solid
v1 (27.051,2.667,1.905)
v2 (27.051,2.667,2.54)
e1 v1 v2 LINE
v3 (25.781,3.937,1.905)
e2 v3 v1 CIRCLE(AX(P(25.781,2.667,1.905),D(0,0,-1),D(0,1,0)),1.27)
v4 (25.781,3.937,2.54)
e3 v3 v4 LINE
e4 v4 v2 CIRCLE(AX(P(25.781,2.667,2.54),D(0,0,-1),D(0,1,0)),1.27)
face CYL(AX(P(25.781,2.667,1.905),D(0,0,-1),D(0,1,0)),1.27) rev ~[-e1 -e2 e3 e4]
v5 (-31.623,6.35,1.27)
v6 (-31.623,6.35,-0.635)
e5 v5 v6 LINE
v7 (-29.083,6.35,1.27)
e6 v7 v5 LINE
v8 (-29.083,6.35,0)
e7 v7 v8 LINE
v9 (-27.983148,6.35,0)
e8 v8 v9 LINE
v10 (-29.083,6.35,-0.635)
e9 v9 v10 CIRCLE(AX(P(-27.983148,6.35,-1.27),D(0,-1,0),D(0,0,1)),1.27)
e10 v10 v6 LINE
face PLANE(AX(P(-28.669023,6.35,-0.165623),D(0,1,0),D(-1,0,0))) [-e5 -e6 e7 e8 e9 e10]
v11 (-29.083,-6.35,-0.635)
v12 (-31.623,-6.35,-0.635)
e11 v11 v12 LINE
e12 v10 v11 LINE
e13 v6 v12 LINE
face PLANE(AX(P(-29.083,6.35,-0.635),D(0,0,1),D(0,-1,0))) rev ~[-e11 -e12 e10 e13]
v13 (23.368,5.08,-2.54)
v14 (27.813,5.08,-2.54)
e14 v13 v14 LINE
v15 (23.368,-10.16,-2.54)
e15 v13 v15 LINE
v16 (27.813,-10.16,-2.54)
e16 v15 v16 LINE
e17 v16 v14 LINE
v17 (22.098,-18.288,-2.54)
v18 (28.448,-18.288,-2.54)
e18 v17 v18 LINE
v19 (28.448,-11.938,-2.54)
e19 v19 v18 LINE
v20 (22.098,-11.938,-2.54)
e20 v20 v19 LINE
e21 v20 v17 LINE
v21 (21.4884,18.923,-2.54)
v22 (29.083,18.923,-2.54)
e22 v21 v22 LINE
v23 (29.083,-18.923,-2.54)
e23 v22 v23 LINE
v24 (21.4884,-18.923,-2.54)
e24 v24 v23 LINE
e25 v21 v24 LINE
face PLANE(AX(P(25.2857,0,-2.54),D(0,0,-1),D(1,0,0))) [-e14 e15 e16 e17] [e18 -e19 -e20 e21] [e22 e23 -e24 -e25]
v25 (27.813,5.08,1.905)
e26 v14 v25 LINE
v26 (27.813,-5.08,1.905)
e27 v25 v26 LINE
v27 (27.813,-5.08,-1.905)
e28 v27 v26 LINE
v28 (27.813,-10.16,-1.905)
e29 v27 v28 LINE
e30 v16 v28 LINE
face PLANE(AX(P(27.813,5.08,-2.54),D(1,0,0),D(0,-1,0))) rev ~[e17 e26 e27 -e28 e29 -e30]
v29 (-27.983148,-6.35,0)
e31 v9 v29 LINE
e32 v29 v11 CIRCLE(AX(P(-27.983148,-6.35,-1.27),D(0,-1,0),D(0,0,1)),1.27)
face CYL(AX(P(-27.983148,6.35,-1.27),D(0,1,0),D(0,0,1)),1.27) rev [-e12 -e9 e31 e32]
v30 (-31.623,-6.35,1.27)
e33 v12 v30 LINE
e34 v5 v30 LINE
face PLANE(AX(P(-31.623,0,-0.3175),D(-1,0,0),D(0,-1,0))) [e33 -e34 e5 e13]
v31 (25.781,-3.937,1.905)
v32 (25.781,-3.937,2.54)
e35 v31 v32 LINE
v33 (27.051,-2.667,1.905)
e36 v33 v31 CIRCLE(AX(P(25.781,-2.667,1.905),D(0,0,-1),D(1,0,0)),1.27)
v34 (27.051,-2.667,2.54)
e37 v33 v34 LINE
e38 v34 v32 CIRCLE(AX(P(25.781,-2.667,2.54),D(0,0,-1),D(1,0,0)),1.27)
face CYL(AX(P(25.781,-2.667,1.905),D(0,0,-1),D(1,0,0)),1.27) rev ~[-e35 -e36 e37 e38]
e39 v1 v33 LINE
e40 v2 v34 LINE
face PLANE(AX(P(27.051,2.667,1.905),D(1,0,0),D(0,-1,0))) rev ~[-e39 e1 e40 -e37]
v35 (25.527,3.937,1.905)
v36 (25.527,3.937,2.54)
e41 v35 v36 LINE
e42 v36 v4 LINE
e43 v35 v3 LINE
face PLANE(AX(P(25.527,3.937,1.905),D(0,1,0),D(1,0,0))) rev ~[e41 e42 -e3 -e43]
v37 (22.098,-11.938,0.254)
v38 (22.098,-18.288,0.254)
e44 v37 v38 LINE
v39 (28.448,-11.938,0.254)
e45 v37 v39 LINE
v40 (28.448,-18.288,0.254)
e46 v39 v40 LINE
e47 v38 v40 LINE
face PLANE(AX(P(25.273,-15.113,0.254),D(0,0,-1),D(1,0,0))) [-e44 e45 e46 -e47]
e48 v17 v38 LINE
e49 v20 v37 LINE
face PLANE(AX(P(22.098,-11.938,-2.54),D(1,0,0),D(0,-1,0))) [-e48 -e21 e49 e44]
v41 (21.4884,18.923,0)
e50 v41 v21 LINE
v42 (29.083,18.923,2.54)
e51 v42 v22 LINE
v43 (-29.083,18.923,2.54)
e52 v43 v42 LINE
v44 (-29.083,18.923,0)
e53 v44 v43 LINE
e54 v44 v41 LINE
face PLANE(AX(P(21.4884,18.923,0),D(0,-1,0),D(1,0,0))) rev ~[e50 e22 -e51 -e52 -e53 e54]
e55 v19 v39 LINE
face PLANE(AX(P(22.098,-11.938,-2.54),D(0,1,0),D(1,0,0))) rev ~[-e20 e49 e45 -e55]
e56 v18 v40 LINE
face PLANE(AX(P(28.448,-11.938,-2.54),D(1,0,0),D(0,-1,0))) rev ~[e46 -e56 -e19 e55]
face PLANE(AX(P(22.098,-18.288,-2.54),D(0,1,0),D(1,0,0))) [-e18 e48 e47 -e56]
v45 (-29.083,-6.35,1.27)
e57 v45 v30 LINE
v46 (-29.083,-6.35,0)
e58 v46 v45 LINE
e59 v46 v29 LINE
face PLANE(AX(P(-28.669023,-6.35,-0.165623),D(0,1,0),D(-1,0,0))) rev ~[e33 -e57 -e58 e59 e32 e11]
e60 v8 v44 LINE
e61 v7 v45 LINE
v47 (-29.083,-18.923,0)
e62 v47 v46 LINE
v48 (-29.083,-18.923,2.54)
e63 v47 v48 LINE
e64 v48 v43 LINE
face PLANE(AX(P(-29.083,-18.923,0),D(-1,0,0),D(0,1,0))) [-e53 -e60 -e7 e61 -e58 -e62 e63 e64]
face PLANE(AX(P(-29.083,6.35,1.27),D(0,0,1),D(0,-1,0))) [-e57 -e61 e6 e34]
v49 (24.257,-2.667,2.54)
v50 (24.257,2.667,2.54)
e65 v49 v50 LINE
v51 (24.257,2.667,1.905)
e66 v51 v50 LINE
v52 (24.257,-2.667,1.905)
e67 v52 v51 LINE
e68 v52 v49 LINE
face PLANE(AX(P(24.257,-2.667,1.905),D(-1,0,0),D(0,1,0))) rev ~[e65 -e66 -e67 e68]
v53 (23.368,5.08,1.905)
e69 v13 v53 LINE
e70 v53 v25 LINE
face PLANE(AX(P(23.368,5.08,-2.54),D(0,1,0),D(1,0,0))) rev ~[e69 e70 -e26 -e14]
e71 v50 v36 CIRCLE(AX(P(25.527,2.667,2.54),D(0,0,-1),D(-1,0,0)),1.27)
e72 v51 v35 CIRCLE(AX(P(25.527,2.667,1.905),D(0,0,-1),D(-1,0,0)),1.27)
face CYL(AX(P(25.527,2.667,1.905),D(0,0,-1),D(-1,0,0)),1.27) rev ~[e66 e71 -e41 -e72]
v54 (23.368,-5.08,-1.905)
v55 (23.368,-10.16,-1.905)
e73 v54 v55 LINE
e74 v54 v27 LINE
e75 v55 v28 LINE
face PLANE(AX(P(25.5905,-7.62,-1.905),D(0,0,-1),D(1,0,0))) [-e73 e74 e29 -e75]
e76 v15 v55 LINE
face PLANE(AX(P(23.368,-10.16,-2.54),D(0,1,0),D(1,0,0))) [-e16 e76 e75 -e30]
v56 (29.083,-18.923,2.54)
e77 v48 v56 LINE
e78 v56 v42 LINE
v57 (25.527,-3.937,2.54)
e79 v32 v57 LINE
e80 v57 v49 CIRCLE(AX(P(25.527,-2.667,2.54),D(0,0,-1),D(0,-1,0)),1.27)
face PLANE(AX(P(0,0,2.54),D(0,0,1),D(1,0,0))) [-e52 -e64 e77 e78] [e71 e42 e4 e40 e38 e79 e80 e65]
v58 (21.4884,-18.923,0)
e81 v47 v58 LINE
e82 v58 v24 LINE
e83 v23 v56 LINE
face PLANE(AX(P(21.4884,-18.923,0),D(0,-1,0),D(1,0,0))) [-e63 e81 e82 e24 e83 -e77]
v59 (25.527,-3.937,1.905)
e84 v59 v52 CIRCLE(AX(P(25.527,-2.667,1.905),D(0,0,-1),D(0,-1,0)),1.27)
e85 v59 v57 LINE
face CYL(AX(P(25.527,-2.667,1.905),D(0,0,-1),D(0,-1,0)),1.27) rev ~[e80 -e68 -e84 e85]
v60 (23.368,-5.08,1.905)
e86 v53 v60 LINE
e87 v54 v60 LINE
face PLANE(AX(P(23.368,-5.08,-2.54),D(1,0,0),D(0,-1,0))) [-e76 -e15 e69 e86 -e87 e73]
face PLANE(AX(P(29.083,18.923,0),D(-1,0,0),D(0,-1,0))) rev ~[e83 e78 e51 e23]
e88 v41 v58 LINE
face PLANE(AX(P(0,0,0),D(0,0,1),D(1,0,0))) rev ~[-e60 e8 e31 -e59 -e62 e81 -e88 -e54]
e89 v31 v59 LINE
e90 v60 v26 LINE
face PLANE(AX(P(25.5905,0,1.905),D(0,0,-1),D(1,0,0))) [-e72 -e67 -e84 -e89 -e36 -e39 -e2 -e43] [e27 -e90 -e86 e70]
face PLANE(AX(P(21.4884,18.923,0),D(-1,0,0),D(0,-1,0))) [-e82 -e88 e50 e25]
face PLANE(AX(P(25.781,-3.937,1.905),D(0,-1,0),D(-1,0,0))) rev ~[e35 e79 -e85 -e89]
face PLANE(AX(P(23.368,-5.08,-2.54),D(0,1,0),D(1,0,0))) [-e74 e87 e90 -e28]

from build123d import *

# Parameters (mm, degrees)
F0_W        = 58.166
F0_H        = 37.846
F1_DEPTH    = 2.54
F2_W        = 7.5946
F2_H        = 37.846
F3_DEPTH    = 2.54
F4_W        = 12.7
F4_H        = 0.635
F4_H_2      = 1.27
F5_DEPTH    = 2.54
F6_T1_DEPTH = 12.7
F7_W        = 4.445
F7_H        = 10.16
F8_DEPTH    = 4.445
F9_W        = 4.445
F9_H        = 5.08
F10_DEPTH   = 0.635
F12_DEPTH   = 0.635
F13_W       = 6.35
F13_H       = 6.35
F14_DEPTH   = 2.794


# Not quite as in the source:
# - a fillet or chamfer that OpenCascade refuses, or shapes differently, is made with other operations: its cross-section is extruded or revolved along the edge and cut away or added


with BuildPart() as f1:
    # F0 (on Top) → F1 (new body)
    with BuildSketch(Plane.XY):
        Rectangle(F0_W, F0_H)
    extrude(amount=F1_DEPTH)

    # F2 (on face) → F3 (join)
    with BuildSketch(Plane(origin=(0, 0, 0), x_dir=(1, 0, 0), z_dir=(0, 0, -1))):
        with Locations((25.2857, 0)):
            Rectangle(F2_W, F2_H)
    extrude(amount=F3_DEPTH)

    # F4 (on face) → F5 (join)
    with BuildSketch(Plane(origin=(-29.083, 0, 0), x_dir=(0, -1, 0), z_dir=(-1, 0, 0))):
        with Locations((0, -0.3175)):
            Rectangle(F4_W, F4_H)
        with Locations((0, 0.635)):
            Rectangle(F4_W, F4_H_2)
    extrude(amount=F5_DEPTH)

    # F6: fillet of radius 1.27 on 1 edges, made by hand

    # F6_s2 → F6_t1 (join)
    with BuildSketch(Plane.XZ.offset(-6.35)):
        with BuildLine():
            ThreePointArc((-27.9831477372, 0), (-28.6181477372, -0.1701477372), (-29.083, -0.635))
            Line((-29.083, -0.635), (-29.083, 0))
            Line((-29.083, 0), (-27.9831477372, 0))
        make_face()
    extrude(amount=F6_T1_DEPTH)

    # F7 (on face) → F8 (cut)
    with BuildSketch(Plane(origin=(0, 0, -2.54), x_dir=(1, 0, 0), z_dir=(0, 0, -1))):
        with Locations((25.5905, 0)):
            Rectangle(F7_W, F7_H)
    extrude(amount=-F8_DEPTH, mode=Mode.SUBTRACT)

    # F9 (on face) → F10 (cut)
    with BuildSketch(Plane(origin=(0, 0, -2.54), x_dir=(1, 0, 0), z_dir=(0, 0, -1))):
        with Locations((25.5905, 7.62)):
            Rectangle(F9_W, F9_H)
    extrude(amount=-F10_DEPTH, mode=Mode.SUBTRACT)

    # F11 (on face) → F12 (cut, through all)
    with BuildSketch(Plane(origin=(0, 0, 1.905), x_dir=(1, 0, 0), z_dir=(0, 0, -1))):
        with BuildLine():
            Line((25.527, -3.937), (25.781, -3.937))
            ThreePointArc((25.781, -3.937), (26.6790256121, -3.5650256121), (27.051, -2.667))
            Line((27.051, -2.667), (27.051, 2.667))
            ThreePointArc((27.051, 2.667), (26.6790256121, 3.5650256121), (25.781, 3.937))
            Line((25.781, 3.937), (25.527, 3.937))
            ThreePointArc((25.527, 3.937), (24.6289743879, 3.5650256121), (24.257, 2.667))
            Line((24.257, 2.667), (24.257, -2.667))
            ThreePointArc((24.257, -2.667), (24.6289743879, -3.5650256121), (25.527, -3.937))
        make_face()
    extrude(amount=-F12_DEPTH, mode=Mode.SUBTRACT)

    # F13 (on face) → F14 (cut)
    with BuildSketch(Plane(origin=(0, 0, -2.54), x_dir=(1, 0, 0), z_dir=(0, 0, -1))):
        with Locations((25.273, 15.113)):
            Rectangle(F13_W, F13_H)
    extrude(amount=-F14_DEPTH, mode=Mode.SUBTRACT)


solid = f1.part
